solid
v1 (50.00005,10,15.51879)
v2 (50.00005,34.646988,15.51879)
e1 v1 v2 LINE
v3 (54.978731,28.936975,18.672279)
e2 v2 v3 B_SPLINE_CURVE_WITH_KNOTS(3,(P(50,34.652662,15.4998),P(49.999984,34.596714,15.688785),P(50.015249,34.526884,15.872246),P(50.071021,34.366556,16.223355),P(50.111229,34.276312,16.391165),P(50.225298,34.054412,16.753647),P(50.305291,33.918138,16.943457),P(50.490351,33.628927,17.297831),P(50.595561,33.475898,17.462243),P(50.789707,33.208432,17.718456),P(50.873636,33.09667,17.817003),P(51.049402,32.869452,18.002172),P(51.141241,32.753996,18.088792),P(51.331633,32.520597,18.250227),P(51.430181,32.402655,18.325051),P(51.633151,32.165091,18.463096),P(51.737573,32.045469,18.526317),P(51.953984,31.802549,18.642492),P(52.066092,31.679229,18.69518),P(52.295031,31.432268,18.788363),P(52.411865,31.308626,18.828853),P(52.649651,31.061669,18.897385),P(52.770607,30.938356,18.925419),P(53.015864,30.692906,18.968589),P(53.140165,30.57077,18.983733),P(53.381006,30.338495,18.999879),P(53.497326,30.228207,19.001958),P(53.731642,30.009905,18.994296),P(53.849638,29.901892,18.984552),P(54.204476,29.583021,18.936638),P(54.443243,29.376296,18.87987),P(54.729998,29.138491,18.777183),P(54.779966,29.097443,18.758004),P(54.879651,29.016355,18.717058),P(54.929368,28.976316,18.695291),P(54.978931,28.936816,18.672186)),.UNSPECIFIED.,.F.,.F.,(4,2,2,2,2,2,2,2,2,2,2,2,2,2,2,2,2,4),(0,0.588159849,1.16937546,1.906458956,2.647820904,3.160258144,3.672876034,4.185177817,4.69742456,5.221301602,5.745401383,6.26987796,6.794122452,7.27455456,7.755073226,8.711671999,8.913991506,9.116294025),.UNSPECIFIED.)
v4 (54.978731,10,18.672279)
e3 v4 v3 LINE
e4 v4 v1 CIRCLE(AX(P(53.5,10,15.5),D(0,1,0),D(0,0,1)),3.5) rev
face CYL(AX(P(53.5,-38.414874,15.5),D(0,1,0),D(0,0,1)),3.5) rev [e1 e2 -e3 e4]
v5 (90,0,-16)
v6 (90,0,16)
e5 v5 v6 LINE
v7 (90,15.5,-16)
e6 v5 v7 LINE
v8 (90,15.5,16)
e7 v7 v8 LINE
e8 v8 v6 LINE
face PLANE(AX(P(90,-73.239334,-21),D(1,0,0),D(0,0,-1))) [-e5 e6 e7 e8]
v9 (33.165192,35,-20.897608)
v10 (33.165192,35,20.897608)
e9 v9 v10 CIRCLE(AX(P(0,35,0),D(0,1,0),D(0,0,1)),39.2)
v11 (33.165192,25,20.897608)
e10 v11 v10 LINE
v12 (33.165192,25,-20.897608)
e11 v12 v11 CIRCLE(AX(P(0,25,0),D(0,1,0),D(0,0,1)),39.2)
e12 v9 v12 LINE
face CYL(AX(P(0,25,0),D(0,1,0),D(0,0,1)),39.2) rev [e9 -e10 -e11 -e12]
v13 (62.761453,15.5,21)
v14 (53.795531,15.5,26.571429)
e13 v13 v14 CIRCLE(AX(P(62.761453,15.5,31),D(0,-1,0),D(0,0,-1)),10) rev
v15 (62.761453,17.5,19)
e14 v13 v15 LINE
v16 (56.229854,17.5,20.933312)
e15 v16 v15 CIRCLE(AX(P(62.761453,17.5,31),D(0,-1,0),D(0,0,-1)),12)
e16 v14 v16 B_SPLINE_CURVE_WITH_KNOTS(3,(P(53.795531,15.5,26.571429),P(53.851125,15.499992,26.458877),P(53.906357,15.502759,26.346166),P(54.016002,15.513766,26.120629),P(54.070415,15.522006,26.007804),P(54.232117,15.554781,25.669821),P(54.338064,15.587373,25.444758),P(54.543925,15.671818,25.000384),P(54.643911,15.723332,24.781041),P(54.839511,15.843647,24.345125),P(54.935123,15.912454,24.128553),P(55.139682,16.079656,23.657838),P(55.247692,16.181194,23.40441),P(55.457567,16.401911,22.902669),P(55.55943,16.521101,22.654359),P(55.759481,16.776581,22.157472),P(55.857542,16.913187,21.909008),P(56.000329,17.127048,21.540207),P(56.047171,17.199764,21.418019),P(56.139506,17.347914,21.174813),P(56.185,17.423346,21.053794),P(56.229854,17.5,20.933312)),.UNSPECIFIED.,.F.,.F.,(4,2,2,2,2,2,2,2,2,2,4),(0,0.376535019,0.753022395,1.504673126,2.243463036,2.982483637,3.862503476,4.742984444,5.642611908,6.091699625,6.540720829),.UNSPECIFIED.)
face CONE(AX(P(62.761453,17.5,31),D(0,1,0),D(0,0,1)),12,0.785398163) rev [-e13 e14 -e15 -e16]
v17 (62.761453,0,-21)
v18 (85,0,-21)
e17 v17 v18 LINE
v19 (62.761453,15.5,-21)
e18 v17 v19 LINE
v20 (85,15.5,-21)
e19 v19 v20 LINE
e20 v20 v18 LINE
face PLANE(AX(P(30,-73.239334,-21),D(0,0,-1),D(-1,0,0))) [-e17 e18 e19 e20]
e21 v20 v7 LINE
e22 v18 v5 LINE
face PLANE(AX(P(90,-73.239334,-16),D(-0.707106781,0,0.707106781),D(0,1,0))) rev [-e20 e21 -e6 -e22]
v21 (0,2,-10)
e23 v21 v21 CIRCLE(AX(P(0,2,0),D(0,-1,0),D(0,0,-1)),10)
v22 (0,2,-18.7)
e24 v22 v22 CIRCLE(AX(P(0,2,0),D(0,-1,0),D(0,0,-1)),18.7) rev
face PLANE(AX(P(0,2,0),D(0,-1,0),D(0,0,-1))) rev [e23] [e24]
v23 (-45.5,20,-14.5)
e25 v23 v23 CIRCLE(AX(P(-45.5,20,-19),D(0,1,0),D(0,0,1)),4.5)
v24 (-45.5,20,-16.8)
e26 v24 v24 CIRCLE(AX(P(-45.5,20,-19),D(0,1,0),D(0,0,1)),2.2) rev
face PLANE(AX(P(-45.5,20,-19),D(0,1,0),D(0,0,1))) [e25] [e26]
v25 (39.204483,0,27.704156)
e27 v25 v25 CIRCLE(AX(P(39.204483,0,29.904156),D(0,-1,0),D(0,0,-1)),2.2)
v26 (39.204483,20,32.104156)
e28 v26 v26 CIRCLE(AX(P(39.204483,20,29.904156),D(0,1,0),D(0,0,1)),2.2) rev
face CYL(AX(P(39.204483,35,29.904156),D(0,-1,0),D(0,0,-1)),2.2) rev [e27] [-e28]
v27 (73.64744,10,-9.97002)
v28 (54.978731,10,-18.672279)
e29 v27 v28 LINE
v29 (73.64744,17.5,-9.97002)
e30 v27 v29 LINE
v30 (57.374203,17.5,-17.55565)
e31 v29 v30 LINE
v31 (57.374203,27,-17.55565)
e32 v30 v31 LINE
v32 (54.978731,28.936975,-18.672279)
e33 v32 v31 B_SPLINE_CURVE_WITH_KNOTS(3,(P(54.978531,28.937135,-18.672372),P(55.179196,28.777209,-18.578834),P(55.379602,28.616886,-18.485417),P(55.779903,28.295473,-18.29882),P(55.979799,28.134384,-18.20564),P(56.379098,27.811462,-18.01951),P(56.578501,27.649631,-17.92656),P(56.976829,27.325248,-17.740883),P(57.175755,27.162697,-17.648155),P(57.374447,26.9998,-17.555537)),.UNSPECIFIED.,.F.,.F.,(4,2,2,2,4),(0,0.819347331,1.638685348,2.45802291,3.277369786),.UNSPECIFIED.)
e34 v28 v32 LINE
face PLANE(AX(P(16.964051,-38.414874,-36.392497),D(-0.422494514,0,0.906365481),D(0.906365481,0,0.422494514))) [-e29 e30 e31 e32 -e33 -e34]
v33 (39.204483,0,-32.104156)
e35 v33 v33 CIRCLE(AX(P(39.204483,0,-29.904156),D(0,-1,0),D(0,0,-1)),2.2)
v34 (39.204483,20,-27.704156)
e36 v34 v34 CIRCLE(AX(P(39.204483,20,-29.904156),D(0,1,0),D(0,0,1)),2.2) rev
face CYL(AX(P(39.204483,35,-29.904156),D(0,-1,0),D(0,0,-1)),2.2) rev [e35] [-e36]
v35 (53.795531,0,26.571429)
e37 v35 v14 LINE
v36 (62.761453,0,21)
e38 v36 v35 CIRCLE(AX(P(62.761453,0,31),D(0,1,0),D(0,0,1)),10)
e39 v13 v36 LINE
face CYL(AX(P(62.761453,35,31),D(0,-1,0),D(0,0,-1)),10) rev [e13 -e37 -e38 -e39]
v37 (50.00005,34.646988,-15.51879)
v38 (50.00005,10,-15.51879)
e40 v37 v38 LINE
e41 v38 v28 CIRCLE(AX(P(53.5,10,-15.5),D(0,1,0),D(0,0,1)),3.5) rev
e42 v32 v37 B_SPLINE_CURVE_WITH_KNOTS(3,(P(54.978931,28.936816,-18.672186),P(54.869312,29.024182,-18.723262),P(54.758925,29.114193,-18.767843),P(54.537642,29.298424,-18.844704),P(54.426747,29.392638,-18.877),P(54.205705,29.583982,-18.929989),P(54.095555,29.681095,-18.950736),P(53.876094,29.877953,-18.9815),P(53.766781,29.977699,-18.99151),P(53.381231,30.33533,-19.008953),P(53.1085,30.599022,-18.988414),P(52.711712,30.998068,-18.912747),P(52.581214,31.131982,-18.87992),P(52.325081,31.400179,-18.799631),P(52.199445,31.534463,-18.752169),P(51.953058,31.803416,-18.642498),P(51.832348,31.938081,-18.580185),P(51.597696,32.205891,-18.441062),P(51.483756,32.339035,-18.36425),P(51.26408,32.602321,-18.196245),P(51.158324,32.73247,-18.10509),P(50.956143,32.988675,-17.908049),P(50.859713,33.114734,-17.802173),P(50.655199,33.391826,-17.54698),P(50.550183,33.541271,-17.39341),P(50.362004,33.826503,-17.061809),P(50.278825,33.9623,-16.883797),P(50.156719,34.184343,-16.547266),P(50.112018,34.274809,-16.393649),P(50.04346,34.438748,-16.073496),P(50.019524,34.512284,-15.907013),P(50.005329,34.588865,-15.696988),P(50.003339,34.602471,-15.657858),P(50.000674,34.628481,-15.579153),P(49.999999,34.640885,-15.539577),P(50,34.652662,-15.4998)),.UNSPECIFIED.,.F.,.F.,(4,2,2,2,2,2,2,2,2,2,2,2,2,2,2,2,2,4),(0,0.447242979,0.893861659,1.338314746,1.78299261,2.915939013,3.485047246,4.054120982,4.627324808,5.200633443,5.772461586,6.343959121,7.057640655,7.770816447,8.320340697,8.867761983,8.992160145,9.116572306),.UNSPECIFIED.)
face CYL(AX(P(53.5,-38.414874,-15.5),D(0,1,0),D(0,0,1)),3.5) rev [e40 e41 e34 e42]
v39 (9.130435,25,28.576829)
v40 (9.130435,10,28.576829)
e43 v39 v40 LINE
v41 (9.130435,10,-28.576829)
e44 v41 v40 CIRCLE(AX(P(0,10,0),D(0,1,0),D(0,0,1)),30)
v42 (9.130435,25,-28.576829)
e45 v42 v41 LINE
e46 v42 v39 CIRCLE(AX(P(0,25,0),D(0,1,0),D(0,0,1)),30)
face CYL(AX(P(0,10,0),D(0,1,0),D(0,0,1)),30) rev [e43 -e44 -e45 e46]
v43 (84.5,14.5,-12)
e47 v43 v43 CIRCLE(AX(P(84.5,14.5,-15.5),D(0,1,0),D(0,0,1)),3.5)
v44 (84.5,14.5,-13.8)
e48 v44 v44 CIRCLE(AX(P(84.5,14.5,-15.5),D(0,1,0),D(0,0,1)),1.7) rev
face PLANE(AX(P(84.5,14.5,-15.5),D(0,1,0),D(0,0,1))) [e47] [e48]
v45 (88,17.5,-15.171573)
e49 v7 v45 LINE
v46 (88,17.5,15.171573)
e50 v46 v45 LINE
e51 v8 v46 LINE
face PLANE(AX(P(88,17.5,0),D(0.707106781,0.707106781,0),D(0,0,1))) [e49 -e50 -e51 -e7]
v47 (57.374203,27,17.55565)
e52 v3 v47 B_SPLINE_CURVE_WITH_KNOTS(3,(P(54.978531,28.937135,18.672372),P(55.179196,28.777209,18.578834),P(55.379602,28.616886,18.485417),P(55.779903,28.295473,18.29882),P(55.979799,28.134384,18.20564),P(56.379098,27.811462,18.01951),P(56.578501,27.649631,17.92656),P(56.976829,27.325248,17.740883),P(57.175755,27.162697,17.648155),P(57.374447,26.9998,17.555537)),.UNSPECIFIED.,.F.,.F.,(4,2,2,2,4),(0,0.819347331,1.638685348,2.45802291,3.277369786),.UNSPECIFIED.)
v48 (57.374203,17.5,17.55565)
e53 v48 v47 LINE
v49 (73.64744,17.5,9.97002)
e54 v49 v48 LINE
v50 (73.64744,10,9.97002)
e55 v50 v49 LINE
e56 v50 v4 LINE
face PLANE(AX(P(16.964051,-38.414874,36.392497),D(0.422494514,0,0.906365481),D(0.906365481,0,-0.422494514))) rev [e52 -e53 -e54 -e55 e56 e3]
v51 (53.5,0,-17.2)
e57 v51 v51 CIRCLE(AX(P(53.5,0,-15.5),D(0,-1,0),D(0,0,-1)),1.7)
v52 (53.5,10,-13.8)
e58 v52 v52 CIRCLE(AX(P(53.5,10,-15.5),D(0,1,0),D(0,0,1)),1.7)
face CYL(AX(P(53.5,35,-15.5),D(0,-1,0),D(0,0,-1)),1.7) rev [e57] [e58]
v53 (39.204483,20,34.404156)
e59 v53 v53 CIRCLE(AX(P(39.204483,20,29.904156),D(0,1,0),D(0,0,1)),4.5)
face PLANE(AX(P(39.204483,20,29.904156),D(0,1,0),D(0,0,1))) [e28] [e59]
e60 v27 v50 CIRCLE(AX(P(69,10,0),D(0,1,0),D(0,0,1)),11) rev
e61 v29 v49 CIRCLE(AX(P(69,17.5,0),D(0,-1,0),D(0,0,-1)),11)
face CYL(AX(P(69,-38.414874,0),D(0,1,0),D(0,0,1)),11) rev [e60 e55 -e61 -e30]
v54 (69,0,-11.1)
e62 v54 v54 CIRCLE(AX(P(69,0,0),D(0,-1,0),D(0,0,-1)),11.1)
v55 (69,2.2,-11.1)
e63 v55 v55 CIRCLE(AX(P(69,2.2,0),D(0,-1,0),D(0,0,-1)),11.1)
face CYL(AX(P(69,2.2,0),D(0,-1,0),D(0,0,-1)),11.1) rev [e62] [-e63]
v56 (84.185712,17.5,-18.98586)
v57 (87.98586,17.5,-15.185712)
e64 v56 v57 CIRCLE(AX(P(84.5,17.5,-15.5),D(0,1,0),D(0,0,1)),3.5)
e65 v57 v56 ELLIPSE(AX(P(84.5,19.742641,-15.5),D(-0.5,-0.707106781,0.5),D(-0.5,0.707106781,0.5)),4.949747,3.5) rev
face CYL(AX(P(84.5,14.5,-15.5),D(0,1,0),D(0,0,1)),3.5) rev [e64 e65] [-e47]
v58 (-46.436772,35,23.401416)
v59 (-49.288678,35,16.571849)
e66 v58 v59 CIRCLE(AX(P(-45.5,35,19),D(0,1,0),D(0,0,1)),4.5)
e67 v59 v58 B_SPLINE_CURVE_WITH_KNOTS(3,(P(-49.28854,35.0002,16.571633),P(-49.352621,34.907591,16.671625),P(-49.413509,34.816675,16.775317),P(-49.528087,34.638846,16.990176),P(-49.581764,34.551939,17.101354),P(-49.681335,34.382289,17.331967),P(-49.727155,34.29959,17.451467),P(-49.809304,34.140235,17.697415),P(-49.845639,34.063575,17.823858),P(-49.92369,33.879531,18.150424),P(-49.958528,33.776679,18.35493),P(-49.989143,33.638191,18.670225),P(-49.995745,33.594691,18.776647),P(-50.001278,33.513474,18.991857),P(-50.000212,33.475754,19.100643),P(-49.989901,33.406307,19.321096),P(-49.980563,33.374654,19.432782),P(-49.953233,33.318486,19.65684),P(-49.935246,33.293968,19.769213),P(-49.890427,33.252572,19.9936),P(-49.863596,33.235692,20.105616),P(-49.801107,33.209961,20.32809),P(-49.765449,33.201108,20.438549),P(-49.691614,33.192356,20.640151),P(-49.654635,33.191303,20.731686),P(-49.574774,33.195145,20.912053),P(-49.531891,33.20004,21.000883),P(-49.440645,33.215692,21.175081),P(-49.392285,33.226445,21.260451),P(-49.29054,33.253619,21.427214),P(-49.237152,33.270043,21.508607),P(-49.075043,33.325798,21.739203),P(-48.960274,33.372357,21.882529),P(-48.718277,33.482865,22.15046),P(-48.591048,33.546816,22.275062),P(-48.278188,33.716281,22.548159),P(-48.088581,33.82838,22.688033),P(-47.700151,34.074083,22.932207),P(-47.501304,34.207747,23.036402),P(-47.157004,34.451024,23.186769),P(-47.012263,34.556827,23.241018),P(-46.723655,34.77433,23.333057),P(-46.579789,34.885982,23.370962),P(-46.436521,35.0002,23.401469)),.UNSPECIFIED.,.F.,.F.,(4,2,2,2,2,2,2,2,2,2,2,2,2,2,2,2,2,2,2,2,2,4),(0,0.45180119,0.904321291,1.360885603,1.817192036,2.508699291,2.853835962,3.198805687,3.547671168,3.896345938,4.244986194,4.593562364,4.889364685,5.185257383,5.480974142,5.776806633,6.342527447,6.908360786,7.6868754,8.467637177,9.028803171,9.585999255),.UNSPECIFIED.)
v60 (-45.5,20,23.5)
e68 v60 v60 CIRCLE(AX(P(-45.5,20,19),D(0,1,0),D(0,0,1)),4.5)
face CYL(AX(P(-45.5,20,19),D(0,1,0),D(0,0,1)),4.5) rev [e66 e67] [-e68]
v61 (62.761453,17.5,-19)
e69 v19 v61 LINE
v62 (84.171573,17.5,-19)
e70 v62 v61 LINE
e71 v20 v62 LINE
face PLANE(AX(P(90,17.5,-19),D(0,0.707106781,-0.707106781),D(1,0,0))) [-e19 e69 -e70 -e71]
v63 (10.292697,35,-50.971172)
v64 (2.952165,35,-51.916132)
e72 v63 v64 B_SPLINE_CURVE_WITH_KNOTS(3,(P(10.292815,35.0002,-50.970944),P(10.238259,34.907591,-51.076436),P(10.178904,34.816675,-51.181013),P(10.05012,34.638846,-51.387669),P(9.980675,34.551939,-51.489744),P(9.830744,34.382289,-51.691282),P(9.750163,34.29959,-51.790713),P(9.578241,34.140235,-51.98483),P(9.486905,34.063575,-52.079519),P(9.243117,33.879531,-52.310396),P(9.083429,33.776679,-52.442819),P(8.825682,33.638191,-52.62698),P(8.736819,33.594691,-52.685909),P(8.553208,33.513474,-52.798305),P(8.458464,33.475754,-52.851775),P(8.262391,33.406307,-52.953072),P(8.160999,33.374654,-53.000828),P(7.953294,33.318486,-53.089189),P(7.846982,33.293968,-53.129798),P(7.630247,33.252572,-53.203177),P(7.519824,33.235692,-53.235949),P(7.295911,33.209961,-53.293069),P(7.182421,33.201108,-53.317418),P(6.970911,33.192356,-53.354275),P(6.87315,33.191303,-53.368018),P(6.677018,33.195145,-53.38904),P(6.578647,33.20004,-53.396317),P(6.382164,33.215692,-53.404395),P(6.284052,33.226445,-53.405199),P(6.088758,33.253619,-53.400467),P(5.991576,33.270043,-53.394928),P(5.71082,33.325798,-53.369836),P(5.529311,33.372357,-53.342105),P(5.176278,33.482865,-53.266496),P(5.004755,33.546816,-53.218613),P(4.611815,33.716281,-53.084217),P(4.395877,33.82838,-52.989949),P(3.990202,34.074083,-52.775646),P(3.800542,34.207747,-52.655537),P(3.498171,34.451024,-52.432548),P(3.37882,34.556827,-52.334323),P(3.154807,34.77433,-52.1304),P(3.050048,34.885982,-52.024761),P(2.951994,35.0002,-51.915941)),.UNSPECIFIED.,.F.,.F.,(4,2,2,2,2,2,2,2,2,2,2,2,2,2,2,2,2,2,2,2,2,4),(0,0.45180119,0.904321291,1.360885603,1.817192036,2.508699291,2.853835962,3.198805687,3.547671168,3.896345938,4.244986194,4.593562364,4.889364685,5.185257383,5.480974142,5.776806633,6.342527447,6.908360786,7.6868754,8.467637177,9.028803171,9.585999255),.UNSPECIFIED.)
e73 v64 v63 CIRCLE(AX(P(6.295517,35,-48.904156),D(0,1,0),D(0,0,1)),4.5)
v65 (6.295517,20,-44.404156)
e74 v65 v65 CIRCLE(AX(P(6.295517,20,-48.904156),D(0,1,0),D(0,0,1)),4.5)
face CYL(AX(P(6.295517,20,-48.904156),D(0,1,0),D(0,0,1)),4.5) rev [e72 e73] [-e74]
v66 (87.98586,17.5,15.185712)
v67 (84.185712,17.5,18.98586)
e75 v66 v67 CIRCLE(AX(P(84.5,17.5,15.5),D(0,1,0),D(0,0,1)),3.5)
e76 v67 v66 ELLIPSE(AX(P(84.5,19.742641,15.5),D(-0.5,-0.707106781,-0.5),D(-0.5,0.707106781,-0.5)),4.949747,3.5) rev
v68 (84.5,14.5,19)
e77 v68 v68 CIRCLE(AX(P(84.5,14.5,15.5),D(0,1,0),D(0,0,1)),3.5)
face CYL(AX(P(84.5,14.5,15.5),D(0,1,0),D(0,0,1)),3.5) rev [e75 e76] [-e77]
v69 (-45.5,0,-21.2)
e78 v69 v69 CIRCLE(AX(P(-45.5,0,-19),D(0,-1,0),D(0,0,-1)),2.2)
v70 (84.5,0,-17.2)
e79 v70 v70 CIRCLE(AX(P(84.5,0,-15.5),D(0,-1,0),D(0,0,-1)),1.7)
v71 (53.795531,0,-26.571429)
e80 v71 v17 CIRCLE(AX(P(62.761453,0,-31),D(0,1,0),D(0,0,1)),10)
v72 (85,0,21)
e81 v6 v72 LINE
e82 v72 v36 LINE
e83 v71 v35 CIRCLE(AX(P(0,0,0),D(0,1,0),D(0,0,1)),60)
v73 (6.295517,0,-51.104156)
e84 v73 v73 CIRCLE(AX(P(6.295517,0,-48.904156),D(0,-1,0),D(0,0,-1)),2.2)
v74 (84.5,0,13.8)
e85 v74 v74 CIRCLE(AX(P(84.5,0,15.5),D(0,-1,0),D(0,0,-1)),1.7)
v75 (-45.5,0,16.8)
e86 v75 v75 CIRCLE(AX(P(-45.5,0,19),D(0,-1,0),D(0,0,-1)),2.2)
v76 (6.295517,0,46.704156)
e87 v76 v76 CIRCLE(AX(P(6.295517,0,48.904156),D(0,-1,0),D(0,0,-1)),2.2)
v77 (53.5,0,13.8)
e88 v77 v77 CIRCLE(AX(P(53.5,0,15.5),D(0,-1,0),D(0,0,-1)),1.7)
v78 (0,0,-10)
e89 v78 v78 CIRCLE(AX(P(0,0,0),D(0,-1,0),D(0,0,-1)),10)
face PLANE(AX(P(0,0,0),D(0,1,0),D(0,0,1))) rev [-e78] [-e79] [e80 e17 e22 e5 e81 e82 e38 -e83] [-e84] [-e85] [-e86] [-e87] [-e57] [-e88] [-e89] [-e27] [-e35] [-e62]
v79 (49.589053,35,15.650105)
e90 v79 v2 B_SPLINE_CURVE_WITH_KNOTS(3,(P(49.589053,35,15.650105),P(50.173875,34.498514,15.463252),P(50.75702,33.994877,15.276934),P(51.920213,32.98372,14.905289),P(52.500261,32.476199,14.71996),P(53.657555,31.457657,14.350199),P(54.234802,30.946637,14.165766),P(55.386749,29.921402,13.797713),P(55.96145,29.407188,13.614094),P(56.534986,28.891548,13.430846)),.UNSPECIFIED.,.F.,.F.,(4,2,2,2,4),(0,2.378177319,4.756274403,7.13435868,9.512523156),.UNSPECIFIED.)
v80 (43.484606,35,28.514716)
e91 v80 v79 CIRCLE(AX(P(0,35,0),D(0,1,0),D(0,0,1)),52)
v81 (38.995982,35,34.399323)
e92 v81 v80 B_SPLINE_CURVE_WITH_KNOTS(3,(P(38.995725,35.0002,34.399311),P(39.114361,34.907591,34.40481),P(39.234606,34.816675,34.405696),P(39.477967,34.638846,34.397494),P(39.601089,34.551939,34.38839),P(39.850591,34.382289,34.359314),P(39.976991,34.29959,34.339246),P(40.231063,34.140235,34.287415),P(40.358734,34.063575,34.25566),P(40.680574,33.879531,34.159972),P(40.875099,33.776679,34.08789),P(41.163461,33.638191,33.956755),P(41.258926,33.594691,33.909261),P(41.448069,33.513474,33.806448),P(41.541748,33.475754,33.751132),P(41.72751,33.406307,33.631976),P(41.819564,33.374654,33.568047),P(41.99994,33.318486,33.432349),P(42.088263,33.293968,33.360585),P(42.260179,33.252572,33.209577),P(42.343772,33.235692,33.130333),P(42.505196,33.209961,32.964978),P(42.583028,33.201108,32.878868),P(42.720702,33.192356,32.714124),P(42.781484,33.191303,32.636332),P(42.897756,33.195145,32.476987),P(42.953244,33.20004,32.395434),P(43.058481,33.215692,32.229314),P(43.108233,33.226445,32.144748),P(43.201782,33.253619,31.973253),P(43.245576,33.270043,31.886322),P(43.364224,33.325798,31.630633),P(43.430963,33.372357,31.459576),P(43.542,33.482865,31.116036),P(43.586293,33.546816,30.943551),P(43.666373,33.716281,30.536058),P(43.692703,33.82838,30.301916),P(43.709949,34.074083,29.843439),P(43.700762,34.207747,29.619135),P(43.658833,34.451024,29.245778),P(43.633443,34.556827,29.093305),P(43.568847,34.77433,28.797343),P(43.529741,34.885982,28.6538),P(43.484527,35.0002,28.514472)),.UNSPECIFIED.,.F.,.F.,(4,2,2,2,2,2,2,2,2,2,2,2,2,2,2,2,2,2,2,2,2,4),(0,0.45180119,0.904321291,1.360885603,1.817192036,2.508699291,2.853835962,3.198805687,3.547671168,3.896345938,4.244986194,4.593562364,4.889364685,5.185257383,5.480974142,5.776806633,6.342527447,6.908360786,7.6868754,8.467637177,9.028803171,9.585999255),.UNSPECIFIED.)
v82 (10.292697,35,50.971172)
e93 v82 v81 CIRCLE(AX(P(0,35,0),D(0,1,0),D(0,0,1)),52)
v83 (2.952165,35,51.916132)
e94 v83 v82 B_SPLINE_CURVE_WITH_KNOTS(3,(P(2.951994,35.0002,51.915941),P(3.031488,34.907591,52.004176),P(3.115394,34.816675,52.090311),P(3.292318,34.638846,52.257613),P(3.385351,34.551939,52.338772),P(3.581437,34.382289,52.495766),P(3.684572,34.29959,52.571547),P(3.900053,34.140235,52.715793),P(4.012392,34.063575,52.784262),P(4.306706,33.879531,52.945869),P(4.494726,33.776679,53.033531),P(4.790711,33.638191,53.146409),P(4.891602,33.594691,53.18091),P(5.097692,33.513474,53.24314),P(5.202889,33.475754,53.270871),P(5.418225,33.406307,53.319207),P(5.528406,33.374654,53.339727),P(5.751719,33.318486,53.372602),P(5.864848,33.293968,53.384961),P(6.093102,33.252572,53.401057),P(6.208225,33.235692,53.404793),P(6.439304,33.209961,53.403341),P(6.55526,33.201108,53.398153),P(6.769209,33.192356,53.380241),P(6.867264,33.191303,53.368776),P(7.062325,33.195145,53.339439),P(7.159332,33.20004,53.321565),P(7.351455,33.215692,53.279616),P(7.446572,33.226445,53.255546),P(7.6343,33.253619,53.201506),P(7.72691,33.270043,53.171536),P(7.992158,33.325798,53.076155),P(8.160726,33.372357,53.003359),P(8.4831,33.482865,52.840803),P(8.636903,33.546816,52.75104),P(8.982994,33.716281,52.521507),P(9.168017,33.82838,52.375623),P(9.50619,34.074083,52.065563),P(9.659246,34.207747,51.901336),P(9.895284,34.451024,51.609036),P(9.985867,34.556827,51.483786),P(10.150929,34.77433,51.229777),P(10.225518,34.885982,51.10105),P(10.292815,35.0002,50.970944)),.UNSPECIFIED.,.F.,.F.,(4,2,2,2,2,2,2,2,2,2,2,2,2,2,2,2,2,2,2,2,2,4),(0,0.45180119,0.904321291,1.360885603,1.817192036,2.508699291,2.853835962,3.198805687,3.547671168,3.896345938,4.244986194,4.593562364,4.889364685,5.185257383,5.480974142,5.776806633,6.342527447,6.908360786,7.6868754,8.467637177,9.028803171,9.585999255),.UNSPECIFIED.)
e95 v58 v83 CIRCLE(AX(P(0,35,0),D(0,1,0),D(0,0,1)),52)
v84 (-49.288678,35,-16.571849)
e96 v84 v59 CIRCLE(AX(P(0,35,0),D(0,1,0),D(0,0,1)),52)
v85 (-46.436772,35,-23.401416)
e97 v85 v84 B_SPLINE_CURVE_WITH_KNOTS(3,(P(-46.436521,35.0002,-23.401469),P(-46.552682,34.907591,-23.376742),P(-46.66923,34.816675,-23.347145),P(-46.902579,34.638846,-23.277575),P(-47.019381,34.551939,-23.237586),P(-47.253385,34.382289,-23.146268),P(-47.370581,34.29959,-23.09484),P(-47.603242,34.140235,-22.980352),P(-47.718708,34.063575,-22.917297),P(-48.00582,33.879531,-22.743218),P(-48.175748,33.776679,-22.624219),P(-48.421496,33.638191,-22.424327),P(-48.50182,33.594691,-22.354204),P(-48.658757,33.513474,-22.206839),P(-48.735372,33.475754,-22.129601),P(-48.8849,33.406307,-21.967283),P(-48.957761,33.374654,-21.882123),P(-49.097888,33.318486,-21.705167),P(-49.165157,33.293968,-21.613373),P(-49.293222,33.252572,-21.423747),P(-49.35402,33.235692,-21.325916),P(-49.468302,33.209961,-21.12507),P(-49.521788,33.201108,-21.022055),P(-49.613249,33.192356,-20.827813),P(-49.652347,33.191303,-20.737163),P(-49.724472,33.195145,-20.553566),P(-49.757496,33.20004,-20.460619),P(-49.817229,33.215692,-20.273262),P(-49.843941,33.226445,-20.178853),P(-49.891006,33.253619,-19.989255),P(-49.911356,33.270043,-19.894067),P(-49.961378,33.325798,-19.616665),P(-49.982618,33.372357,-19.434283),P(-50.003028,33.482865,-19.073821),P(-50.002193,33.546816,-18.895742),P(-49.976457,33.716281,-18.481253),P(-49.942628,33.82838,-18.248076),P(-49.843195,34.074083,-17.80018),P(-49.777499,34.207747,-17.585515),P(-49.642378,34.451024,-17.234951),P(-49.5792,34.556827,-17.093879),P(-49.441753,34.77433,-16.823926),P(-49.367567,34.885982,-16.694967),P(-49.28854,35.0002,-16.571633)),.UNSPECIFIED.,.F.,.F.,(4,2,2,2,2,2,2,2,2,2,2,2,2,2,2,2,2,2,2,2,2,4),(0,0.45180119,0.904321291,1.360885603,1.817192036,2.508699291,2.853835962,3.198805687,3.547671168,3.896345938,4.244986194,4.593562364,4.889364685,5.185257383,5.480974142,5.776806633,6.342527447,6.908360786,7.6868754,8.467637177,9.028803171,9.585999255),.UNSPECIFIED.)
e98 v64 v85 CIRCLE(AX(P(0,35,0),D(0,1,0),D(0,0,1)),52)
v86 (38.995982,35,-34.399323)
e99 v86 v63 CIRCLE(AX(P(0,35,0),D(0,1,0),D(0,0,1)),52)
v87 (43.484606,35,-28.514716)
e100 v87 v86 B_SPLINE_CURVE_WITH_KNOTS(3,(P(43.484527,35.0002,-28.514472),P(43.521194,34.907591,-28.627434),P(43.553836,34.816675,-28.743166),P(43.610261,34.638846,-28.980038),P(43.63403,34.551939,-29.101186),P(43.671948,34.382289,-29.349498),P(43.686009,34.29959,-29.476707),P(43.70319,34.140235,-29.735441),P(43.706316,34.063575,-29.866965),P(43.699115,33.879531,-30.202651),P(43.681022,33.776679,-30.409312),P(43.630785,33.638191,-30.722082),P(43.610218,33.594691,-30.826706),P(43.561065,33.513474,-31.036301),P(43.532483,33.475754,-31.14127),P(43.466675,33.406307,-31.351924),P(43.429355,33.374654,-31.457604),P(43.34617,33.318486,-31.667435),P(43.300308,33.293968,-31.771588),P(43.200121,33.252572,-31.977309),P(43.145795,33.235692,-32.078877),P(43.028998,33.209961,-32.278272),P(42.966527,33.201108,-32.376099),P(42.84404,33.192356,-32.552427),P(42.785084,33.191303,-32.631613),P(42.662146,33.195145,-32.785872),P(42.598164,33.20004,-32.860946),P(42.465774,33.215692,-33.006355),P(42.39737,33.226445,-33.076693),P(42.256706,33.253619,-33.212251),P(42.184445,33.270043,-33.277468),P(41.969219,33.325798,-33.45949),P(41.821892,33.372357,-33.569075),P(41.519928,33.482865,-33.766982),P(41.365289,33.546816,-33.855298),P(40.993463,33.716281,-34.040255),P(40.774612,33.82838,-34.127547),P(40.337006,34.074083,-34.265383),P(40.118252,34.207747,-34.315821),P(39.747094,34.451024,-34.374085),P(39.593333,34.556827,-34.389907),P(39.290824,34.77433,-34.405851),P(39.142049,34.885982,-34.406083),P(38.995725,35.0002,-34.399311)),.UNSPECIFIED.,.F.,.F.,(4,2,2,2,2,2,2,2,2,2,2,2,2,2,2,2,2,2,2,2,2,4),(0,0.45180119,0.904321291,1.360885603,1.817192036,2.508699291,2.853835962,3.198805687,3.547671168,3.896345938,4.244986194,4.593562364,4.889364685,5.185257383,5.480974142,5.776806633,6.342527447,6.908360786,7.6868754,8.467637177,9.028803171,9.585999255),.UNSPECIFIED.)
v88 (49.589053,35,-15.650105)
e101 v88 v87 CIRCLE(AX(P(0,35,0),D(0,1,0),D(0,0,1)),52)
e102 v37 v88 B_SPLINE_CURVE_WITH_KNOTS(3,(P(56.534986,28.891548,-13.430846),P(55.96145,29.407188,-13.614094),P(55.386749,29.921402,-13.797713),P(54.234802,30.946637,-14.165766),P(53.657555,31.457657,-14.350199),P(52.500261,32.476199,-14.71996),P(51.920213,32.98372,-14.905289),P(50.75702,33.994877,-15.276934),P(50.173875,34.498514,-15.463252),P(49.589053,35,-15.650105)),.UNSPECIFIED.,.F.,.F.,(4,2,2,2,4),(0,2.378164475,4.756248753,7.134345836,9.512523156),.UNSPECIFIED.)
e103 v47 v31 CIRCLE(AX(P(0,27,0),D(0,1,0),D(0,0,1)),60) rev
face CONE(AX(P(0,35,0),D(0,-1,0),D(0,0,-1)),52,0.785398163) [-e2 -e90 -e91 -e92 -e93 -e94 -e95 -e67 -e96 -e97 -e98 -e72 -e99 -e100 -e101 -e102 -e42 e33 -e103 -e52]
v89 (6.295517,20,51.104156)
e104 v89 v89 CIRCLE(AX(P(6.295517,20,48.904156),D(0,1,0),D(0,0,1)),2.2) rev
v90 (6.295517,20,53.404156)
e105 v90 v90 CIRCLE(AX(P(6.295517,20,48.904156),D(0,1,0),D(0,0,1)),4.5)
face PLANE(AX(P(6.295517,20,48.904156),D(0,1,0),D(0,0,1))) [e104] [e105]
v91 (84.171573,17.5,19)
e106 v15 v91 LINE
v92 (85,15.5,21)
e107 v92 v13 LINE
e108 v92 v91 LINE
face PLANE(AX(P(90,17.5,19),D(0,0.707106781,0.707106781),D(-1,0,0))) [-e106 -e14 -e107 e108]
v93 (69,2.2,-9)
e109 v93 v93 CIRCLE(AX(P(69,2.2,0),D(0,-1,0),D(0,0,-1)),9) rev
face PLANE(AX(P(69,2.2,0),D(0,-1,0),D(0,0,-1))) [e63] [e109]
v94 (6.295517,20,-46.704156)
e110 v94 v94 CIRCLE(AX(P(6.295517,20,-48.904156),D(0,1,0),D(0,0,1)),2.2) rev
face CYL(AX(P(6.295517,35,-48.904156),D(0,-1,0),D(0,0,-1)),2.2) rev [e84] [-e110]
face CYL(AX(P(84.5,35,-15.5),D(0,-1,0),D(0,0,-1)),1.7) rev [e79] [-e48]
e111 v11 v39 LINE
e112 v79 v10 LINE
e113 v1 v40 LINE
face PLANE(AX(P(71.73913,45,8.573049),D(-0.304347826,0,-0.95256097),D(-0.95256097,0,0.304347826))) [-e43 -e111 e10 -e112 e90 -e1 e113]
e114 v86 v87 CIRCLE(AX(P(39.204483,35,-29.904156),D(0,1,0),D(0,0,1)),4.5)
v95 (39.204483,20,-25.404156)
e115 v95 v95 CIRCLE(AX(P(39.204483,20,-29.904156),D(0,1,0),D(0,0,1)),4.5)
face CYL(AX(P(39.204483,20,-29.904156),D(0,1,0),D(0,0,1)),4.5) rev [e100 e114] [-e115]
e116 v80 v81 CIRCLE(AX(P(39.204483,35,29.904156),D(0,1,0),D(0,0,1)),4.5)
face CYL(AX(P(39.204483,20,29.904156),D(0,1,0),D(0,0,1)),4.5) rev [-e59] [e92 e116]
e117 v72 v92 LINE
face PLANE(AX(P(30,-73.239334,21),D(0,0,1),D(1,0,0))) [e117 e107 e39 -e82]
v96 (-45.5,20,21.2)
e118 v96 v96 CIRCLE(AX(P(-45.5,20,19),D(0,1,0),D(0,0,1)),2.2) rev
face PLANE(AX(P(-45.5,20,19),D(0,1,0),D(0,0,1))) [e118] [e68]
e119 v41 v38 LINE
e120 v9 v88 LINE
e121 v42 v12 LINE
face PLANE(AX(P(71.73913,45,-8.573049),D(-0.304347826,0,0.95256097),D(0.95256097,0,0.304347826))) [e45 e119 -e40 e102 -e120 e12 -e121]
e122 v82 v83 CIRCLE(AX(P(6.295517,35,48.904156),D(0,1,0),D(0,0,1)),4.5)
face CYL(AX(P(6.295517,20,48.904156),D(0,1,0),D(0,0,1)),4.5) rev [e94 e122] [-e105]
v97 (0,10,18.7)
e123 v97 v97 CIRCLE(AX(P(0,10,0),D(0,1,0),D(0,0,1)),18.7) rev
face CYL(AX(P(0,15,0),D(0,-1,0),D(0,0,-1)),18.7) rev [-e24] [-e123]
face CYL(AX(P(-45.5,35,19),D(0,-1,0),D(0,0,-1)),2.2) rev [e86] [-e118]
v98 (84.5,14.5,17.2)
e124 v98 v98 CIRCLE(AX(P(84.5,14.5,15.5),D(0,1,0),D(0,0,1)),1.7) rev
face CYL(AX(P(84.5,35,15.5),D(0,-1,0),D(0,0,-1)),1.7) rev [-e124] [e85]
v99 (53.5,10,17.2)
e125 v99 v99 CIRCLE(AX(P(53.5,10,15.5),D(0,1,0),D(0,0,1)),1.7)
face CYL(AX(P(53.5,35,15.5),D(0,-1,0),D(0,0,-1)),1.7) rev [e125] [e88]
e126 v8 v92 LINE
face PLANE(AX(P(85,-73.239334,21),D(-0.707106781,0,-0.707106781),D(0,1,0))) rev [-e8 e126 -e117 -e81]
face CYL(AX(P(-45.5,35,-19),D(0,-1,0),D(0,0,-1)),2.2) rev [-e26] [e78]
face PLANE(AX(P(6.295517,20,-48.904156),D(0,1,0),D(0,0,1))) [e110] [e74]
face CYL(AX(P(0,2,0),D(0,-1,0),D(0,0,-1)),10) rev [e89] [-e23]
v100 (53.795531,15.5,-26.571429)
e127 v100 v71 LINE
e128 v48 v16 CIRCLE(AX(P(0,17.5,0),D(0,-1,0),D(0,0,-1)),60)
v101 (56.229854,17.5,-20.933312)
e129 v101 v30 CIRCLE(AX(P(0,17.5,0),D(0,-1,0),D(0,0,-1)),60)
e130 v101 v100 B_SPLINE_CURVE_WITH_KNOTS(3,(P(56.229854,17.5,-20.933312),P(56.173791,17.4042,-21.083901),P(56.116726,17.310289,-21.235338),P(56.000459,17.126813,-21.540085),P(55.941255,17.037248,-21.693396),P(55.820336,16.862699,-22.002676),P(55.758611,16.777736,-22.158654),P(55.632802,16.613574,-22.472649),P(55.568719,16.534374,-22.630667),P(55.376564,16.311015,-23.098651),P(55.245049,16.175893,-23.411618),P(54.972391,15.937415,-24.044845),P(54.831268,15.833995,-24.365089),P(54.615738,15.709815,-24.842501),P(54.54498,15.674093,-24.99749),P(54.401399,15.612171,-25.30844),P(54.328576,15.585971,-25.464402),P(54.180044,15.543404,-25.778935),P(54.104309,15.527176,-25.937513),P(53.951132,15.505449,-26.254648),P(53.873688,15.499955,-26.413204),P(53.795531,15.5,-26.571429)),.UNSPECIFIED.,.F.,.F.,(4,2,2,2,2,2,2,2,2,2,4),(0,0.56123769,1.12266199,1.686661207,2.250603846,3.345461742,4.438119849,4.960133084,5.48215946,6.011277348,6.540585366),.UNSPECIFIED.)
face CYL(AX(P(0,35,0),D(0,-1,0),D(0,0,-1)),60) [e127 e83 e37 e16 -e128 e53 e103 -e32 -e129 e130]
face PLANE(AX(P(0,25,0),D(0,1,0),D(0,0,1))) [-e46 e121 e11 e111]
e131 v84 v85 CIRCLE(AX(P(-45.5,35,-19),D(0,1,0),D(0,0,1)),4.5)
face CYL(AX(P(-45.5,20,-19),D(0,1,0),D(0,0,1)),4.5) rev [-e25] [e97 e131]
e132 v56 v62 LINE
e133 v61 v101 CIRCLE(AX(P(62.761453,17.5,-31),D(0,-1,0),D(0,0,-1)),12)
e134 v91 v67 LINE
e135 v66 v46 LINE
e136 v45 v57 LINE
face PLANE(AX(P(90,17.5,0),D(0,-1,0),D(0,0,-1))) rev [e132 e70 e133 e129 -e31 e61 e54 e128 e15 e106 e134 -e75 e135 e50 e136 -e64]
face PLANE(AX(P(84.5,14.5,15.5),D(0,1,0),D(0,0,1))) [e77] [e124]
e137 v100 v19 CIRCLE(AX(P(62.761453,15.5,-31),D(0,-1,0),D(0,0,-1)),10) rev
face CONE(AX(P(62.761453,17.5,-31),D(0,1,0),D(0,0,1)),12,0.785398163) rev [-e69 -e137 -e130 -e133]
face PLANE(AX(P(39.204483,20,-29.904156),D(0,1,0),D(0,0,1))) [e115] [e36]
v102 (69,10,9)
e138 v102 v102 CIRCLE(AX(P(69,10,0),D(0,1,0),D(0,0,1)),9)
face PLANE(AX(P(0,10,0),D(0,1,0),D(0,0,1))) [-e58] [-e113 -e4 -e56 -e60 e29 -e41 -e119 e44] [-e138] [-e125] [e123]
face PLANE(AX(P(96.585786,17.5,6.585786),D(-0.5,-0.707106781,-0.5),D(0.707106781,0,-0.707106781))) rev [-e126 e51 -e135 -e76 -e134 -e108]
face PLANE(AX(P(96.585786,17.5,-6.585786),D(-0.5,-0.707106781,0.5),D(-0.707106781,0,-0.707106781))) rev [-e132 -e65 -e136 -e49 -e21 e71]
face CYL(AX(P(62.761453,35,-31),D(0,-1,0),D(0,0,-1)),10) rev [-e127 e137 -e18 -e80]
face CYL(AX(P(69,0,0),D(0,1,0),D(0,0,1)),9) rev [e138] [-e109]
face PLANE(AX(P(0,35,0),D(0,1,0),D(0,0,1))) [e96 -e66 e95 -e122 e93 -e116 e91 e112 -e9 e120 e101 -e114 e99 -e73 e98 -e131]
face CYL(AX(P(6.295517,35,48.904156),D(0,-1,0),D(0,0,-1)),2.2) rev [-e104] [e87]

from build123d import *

# Parameters (mm, degrees)
SKETCH_1_R                      = 60
EXTRUDE_1_DEPTH                 = 35
SKETCH_2_W                      = 60
SKETCH_2_H                      = 42
EXTRUDE_2_DEPTH                 = 35
CHAMFER_1_SIZE                  = 5
SKETCH_5_R                      = 39.2
CUT_EXTRUDE_1_DEPTH             = 10
SKETCH_6_R                      = 18.7
CUT_EXTRUDE_2_DEPTH             = 15
SKETCH_7_R                      = 30
CUT_EXTRUDE_3_DEPTH             = 15
CUT_EXTRUDE_4_REACH             = 113.018
CUT_EXTRUDE_4_DIRECTION_2_DEPTH = 20
FILLET_1_R                      = 10
CHAMFER_2_SIZE                  = 2.196152423
CHAMFER_3_SIZE                  = 8
CHAMFER_4_SIZE                  = 2
SKETCH_9_R                      = 20
SKETCH_9_R_2                    = 10
EXTRUDE_4_DEPTH                 = 2
SKETCH_11_R                     = 2.2
CUT_EXTRUDE_5_DEPTH             = 114.688170062
SKETCH_12_R                     = 4.5
CUT_EXTRUDE_6_DEPTH             = 15
SKETCH_13_R                     = 1.7
CUT_EXTRUDE_7_DEPTH             = 114.688170093
CUT_EXTRUDE_11_REACH            = 115.688
SKETCH_16_R                     = 3.5
SKETCH_16_R_2                   = 11
SKETCH_17_R                     = 3.5
CUT_EXTRUDE_12_DEPTH            = 3
SKETCH_19_R                     = 9
CUT_EXTRUDE_13_DEPTH            = 112.018016632
SKETCH_21_R                     = 11.1
CUT_EXTRUDE_14_DEPTH            = 2.2


with BuildPart() as part:
    # 草图1 → 凸台-拉伸1 (new body)
    with BuildSketch(Plane(origin=(0, 0, 0), x_dir=(1, 0, 0), z_dir=(0, 1, 0))):
        with Locations(Location((0, 0, 0), (0, 0, 270))):
            Circle(SKETCH_1_R)
    extrude(amount=EXTRUDE_1_DEPTH)

    # 草图2 → 凸台-拉伸2 (add)
    with BuildSketch(Plane(origin=(0, 35, 0), x_dir=(1, 0, 0), z_dir=(0, 1, 0))):
        with Locations((60, 0)):
            Rectangle(SKETCH_2_W, SKETCH_2_H)
    extrude(amount=-EXTRUDE_2_DEPTH)

    # 倒角1
    chamfer_1_edges = [part.edges().sort_by_distance(p)[0] for p in [
        (90, 17.5, 21),
        (90, 17.5, -21),
    ]]
    chamfer(chamfer_1_edges, length=CHAMFER_1_SIZE)

    # 草图4 → 切除-旋转2 (revolve, cut)
    with BuildSketch(Plane.XY, mode=Mode.PRIVATE) as cut_revolve_2_sk:
        Polygon((90, 17.5), (60, 17.5), (60, 35), (115.576155226, 66.533788533), (104.161454132, 17.5), align=None)
    revolve(cut_revolve_2_sk.sketch.rotate(Axis((0, 0, 0), (0, 1, 0)), 20.487315115), axis=Axis((0, 0, 0), (0, 1, 0)), mode=Mode.SUBTRACT)

    # 草图5 → 切除-拉伸1 (cut)
    with BuildSketch(Plane(origin=(0, 35, 0), x_dir=(1, 0, 0), z_dir=(0, 1, 0))):
        with Locations(Location((0, 0, 0), (0, 0, 270))):
            Circle(SKETCH_5_R)
    extrude(amount=-CUT_EXTRUDE_1_DEPTH, mode=Mode.SUBTRACT)

    # 草图6 → 切除-拉伸2 (cut)
    with BuildSketch(Plane.XZ):
        with Locations(Location((0, 0, 0), (0, 0, 270))):
            Circle(SKETCH_6_R)
    extrude(amount=-CUT_EXTRUDE_2_DEPTH, mode=Mode.SUBTRACT)

    # 草图7 → 切除-拉伸3 (cut)
    with BuildSketch(Plane(origin=(0, 25, 0), x_dir=(1, 0, 0), z_dir=(0, 1, 0))):
        with Locations(Location((0, 0, 0), (0, 0, 270))):
            Circle(SKETCH_7_R)
    extrude(amount=-CUT_EXTRUDE_3_DEPTH, mode=Mode.SUBTRACT)

    # 切除-拉伸4: up to this face of the body (flat: up to its plane)
    cut_extrude_4_end = Plane(part.part.faces().sort_by_distance((0, 10, -29.151471863))[0])
    # 草图8 → 切除-拉伸4 (cut, up to the picked face)
    with BuildSketch(Plane(origin=(0, 25, 0), x_dir=(1, 0, 0), z_dir=(0, 1, 0)), mode=Mode.PRIVATE) as cut_extrude_4_sk1:
        with BuildLine():
            Line((71.739130435, 8.573048726), (9.130434783, 28.576829087))
            ThreePointArc((9.130434783, 28.576829087), (-30, 0), (9.130434783, -28.576829087))
            Line((9.130434783, -28.576829087), (71.739130435, -8.573048726))
            ThreePointArc((71.739130435, -8.573048726), (78, 0), (71.739130435, 8.573048726))
        make_face()
    cut_extrude_4_tool1 = split(extrude(cut_extrude_4_sk1.sketch, amount=-CUT_EXTRUDE_4_REACH, mode=Mode.PRIVATE), bisect_by=cut_extrude_4_end, keep=Keep.BOTH, mode=Mode.PRIVATE)
    add(cut_extrude_4_tool1.solids().sort_by(Axis((16.355777, 25, 0), (0, -1, 0)))[0], mode=Mode.SUBTRACT)

    # 草图8 → 切除-拉伸4 direction 2 (cut)
    with BuildSketch(Plane(origin=(0, 25, 0), x_dir=(1, 0, 0), z_dir=(0, 1, 0))):
        with BuildLine():
            Line((71.739130435, 8.573048726), (9.130434783, 28.576829087))
            ThreePointArc((9.130434783, 28.576829087), (-30, 0), (9.130434783, -28.576829087))
            Line((9.130434783, -28.576829087), (71.739130435, -8.573048726))
            ThreePointArc((71.739130435, -8.573048726), (78, 0), (71.739130435, 8.573048726))
        make_face()
    extrude(amount=CUT_EXTRUDE_4_DIRECTION_2_DEPTH, mode=Mode.SUBTRACT)

    # 圆角1
    # the kernel refuses this fillet: 10 mm, written as the material it adds along each edge
    with BuildSketch(Plane(origin=(56.204981986, 17.5, 21), x_dir=(1, 0, 0), z_dir=(0, -1, 0))) as fillet_1_piece_1:
        with BuildLine():
            CenterArc((6.556471152, 10), FILLET_1_R, 206.286320683, 63.713679317)
            ThreePointArc((-2.409450724, 5.571428571), (-1.134223568, 2.816203881), (0, 0))
            Line((0, 0), (6.556471152, 0))
        make_face()
    extrude(amount=17.5)
    with BuildSketch(Plane(origin=(56.204981986, 17.5, -21), x_dir=(1, 0, 0), z_dir=(0, -1, 0))) as fillet_1_piece_2:
        with BuildLine():
            CenterArc((6.556471152, -10), FILLET_1_R, 90, 63.713679317)
            ThreePointArc((-2.409450724, -5.571428571), (-1.134223568, -2.816203881), (0, 0))
            Line((0, 0), (6.556471152, 0))
        make_face()
    extrude(amount=17.5)

    # 倒角2
    # the kernel refuses this chamfer: 3, 2.196152423 mm, written as the material it takes off along each edge
    with BuildSketch(Plane(origin=(58.626954681, 42.533431537, -12.762452149), x_dir=(-0.2364968770053105, 0, -0.9716322489330699), z_dir=(0, -1, 0)), Plane(origin=(58.626954681, 17.5, 12.762452149), x_dir=(-0.23649687700531016, 1.9673259082088774e-15, 0.97163224893307), z_dir=(0, 1, 0))) as chamfer_2_piece_1:
        with BuildLine():
            Line((2.929363215, 0), (CHAMFER_2_SIZE * 0.520991857111, -CHAMFER_2_SIZE * 0.853561646606))
            Line((CHAMFER_2_SIZE * 0.520991857111, -CHAMFER_2_SIZE * 0.853561646606), (0, 0))
            ThreePointArc((0, 0), (1.506042049, 0.017865844), (2.929363215, 0))
        make_face()
    extrude(amount=25.033431537, mode=Mode.SUBTRACT)

    # 倒角3
    # the kernel refuses this chamfer: 8 mm, written as the material it takes off along each edge
    with BuildSketch(Plane(origin=(0, 35, 0), x_dir=(0.9966795405762429, 0, -0.08142415732895002), z_dir=(-0.08142415732895002, 0, -0.9966795405762429))) as chamfer_3_piece_1:
        Polygon((60 - CHAMFER_3_SIZE, 0), (60, CHAMFER_3_SIZE), (60, 0), align=None)
    revolve(axis=Axis((0, 35, 0), (0, -1, 0)), revolution_arc=344.183115921, mode=Mode.SUBTRACT)
    with BuildSketch(Plane(origin=(0, 35, 0), x_dir=(0.936749699758066, 0, -0.3500000000045331), z_dir=(-0.3500000000045331, 0, -0.936749699758066))) as chamfer_3_piece_2:
        Polygon((60 - CHAMFER_3_SIZE, 0), (60, CHAMFER_3_SIZE), (60, 0), align=None)
    revolve(axis=Axis((0, 35, 0), (0, -1, 0)), revolution_arc=25.054872626, mode=Mode.SUBTRACT)

    # 倒角4
    # the kernel refuses this chamfer: 2 mm, written as the material it takes off along each edge
    with BuildSketch(Plane(origin=(62.761453138, 17.5, -31), x_dir=(0, 0, 1), z_dir=(1, 0, 0))) as chamfer_4_piece_1_section:
        Polygon((10, CHAMFER_4_SIZE), (10 + CHAMFER_4_SIZE, 0), (10, 0), align=None)
    chamfer_4_piece_1 = revolve(axis=Axis((62.761453138, 17.5, -31), (0, -1, 0)), revolution_arc=113.821601389, mode=Mode.PRIVATE)
    chamfer_4_piece_1 = chamfer_4_piece_1 - Plane(origin=(0, 17.5, 0), x_dir=(0, 0, 1), z_dir=(0, -1, 0)) * Cylinder(60, 48, mode=Mode.PRIVATE)
    add(chamfer_4_piece_1, mode=Mode.SUBTRACT)
    with BuildSketch(Plane(origin=(81.36309104, 17.5, -24.63690896), x_dir=(-0.7071067811865476, 0, 0.7071067811865476), z_dir=(0.7071067811865476, 0, 0.7071067811865476)), Plane(origin=(93.63690896, 17.5, 12.36309104), x_dir=(-0.7071067811865476, 0, -0.7071067811865476), z_dir=(-0.7071067811865476, 0, 0.7071067811865476))) as chamfer_4_piece_2:
        Polygon((CHAMFER_4_SIZE, 0), (0, CHAMFER_4_SIZE), (0, 0), align=None)
    extrude(amount=17.357799764, mode=Mode.SUBTRACT)
    with BuildSketch(Plane(origin=(90, 17.5, 21.143365976), x_dir=(-1, 0, 0), z_dir=(0, 0, -1))) as chamfer_4_piece_3:
        Polygon((CHAMFER_4_SIZE, 0), (0, -CHAMFER_4_SIZE), (0, 0), align=None)
    extrude(amount=42.286731952, mode=Mode.SUBTRACT)
    with BuildSketch(Plane(origin=(90.143365976, 17.5, -21), x_dir=(0, -1, 0), z_dir=(-1, 0, 0))) as chamfer_4_piece_4:
        Polygon((CHAMFER_4_SIZE, 0), (0, CHAMFER_4_SIZE), (0, 0), align=None)
    extrude(amount=27.381912838, mode=Mode.SUBTRACT)
    with BuildSketch(Plane(origin=(62.761453138, 17.5, 21), x_dir=(0, 0, -1), z_dir=(1, 0, 0))) as chamfer_4_piece_5:
        Polygon((CHAMFER_4_SIZE, 0), (0, -CHAMFER_4_SIZE), (0, 0), align=None)
    extrude(amount=27.381912838, mode=Mode.SUBTRACT)
    with BuildSketch(Plane(origin=(62.761453138, 17.5, 31), x_dir=(-0.9148074600543132, 0, 0.40389022150700316), z_dir=(0.40389022150700316, 0, 0.9148074600543132))) as chamfer_4_piece_6_section:
        Polygon((10 + CHAMFER_4_SIZE, 0), (10, CHAMFER_4_SIZE), (10, 0), align=None)
    chamfer_4_piece_6 = revolve(axis=Axis((62.761453138, 17.5, 31), (0, -1, 0)), revolution_arc=113.821601389, mode=Mode.PRIVATE)
    chamfer_4_piece_6 = chamfer_4_piece_6 - Plane(origin=(0, 17.5, 0), x_dir=(0, 0, 1), z_dir=(0, -1, 0)) * Cylinder(60, 48, mode=Mode.PRIVATE)
    add(chamfer_4_piece_6, mode=Mode.SUBTRACT)

    # 草图9 → 凸台-拉伸4 (add)
    with BuildSketch(Plane.XZ):
        Circle(SKETCH_9_R)
        with Locations(Location((0, 0, 0), (0, 0, 270))):
            Circle(SKETCH_9_R_2, mode=Mode.SUBTRACT)
    extrude(amount=-EXTRUDE_4_DEPTH)

    # 草图11 → 切除-拉伸5 (cut, through all)
    with BuildSketch(Plane.XZ):
        with Locations(Location((6.295517328, -48.904155872, 0), (0, 0, 270))):
            Circle(SKETCH_11_R)
        with Locations(Location((39.204482672, -29.904155872, 0), (0, 0, 270))):
            Circle(SKETCH_11_R)
        with Locations(Location((-45.5, -19, 0), (0, 0, 270))):
            Circle(SKETCH_11_R)
        with Locations(Location((-45.5, 19, 0), (0, 0, 270))):
            Circle(SKETCH_11_R)
        with Locations(Location((6.295517328, 48.904155872, 0), (0, 0, 270))):
            Circle(SKETCH_11_R)
        with Locations(Location((39.204482672, 29.904155872, 0), (0, 0, 270))):
            Circle(SKETCH_11_R)
    extrude(amount=-CUT_EXTRUDE_5_DEPTH, mode=Mode.SUBTRACT)

    # 草图12 → 切除-拉伸6 (cut)
    with BuildSketch(Plane(origin=(0, 35, 0), x_dir=(1, 0, 0), z_dir=(0, 1, 0))):
        with Locations(Location((-45.5, 19, 0), (0, 0, 270))):
            Circle(SKETCH_12_R)
        with Locations(Location((-45.5, -19, 0), (0, 0, 270))):
            Circle(SKETCH_12_R)
        with Locations(Location((6.295517328, -48.904155872, 0), (0, 0, 270))):
            Circle(SKETCH_12_R)
        with Locations(Location((39.204482672, -29.904155872, 0), (0, 0, 270))):
            Circle(SKETCH_12_R)
        with Locations(Location((39.204482672, 29.904155872, 0), (0, 0, 270))):
            Circle(SKETCH_12_R)
        with Locations(Location((6.295517328, 48.904155872, 0), (0, 0, 270))):
            Circle(SKETCH_12_R)
    extrude(amount=-CUT_EXTRUDE_6_DEPTH, mode=Mode.SUBTRACT)

    # 草图13 → 切除-拉伸7 (cut, through all)
    with BuildSketch(Plane.XZ):
        with Locations(Location((84.5, -15.5, 0), (0, 0, 270))):
            Circle(SKETCH_13_R)
        with Locations(Location((53.5, -15.5, 0), (0, 0, 270))):
            Circle(SKETCH_13_R)
        with Locations(Location((84.5, 15.5, 0), (0, 0, 270))):
            Circle(SKETCH_13_R)
        with Locations(Location((53.5, 15.5, 0), (0, 0, 270))):
            Circle(SKETCH_13_R)
    extrude(amount=-CUT_EXTRUDE_7_DEPTH, mode=Mode.SUBTRACT)

    # 切除-拉伸11: up to this face of the body (flat: up to its plane)
    cut_extrude_11_end = Plane(part.part.faces().sort_by_distance((21.845822078, 10, 0))[0])
    # 草图16 → 切除-拉伸11 (cut, up to the picked face)
    with BuildSketch(Plane(origin=(0, 35, 0), x_dir=(1, 0, 0), z_dir=(0, 1, 0)), mode=Mode.PRIVATE) as cut_extrude_11_sk1:
        with Locations((53.5, -15.5)):
            Circle(SKETCH_16_R)
    cut_extrude_11_tool1 = split(extrude(cut_extrude_11_sk1.sketch, amount=-CUT_EXTRUDE_11_REACH, mode=Mode.PRIVATE), bisect_by=cut_extrude_11_end, keep=Keep.BOTH, mode=Mode.PRIVATE)
    # 草图16 → 切除-拉伸11 (cut, up to the picked face)
    with BuildSketch(Plane(origin=(0, 35, 0), x_dir=(1, 0, 0), z_dir=(0, 1, 0)), mode=Mode.PRIVATE) as cut_extrude_11_sk2:
        with Locations((53.5, 15.5)):
            Circle(SKETCH_16_R)
    cut_extrude_11_tool2 = split(extrude(cut_extrude_11_sk2.sketch, amount=-CUT_EXTRUDE_11_REACH, mode=Mode.PRIVATE), bisect_by=cut_extrude_11_end, keep=Keep.BOTH, mode=Mode.PRIVATE)
    # 草图16 → 切除-拉伸11 (cut, up to the picked face)
    with BuildSketch(Plane(origin=(0, 35, 0), x_dir=(1, 0, 0), z_dir=(0, 1, 0)), mode=Mode.PRIVATE) as cut_extrude_11_sk3:
        with BuildLine():
            ThreePointArc((57, -15.5), (56.451741672, -17.380750144), (54.978730798, -18.672279185))
            Line((54.978730798, -18.672279185), (73.64743965, -9.970020296))
            ThreePointArc((73.64743965, -9.970020296), (58, 0), (73.64743965, 9.970020296))
            Line((73.64743965, 9.970020296), (54.978730798, 18.672279185))
            ThreePointArc((54.978730798, 18.672279185), (56.451741672, 17.380750144), (57, 15.5))
            ThreePointArc((57, 15.5), (53.5, 12), (50, 15.5))
            Line((50, 15.5), (50, -15.5))
            ThreePointArc((50, -15.5), (53.5, -12), (57, -15.5))
        make_face()
    cut_extrude_11_tool3 = split(extrude(cut_extrude_11_sk3.sketch, amount=-CUT_EXTRUDE_11_REACH, mode=Mode.PRIVATE), bisect_by=cut_extrude_11_end, keep=Keep.BOTH, mode=Mode.PRIVATE)
    # 草图16 → 切除-拉伸11 (cut, up to the picked face)
    with BuildSketch(Plane(origin=(0, 35, 0), x_dir=(1, 0, 0), z_dir=(0, 1, 0)), mode=Mode.PRIVATE) as cut_extrude_11_sk4:
        with Locations((69, 0)):
            Circle(SKETCH_16_R_2)
    cut_extrude_11_tool4 = split(extrude(cut_extrude_11_sk4.sketch, amount=-CUT_EXTRUDE_11_REACH, mode=Mode.PRIVATE), bisect_by=cut_extrude_11_end, keep=Keep.BOTH, mode=Mode.PRIVATE)
    add(cut_extrude_11_tool1.solids().sort_by(Axis((53.5, 35, 15.5), (0, -1, 0)))[0], mode=Mode.SUBTRACT)
    add(cut_extrude_11_tool2.solids().sort_by(Axis((53.5, 35, -15.5), (0, -1, 0)))[0], mode=Mode.SUBTRACT)
    add(cut_extrude_11_tool3.solids().sort_by(Axis((57.12752, 35, 0), (0, -1, 0)))[0], mode=Mode.SUBTRACT)
    add(cut_extrude_11_tool4.solids().sort_by(Axis((69, 35, 0), (0, -1, 0)))[0], mode=Mode.SUBTRACT)

    # 草图17 → 切除-拉伸12 (cut)
    with BuildSketch(Plane(origin=(0, 17.5, 0), x_dir=(1, 0, 0), z_dir=(0, 1, 0))):
        with Locations(Location((84.5, -15.5, 0), (0, 0, 270))):
            Circle(SKETCH_17_R)
        with Locations(Location((84.5, 15.5, 0), (0, 0, 270))):
            Circle(SKETCH_17_R)
    extrude(amount=-CUT_EXTRUDE_12_DEPTH, mode=Mode.SUBTRACT)

    # 草图19 → 切除-拉伸13 (cut, through all)
    with BuildSketch(Plane(origin=(0, 10, 0), x_dir=(1, 0, 0), z_dir=(0, 1, 0))):
        with Locations(Location((69, 0, 0), (0, 0, 270))):
            Circle(SKETCH_19_R)
    extrude(amount=-CUT_EXTRUDE_13_DEPTH, mode=Mode.SUBTRACT)

    # 草图21 → 切除-拉伸14 (cut)
    with BuildSketch(Plane.XZ):
        with Locations(Location((69, 0, 0), (0, 0, 270))):
            Circle(SKETCH_21_R)
    extrude(amount=-CUT_EXTRUDE_14_DEPTH, mode=Mode.SUBTRACT)


solid = part.part
